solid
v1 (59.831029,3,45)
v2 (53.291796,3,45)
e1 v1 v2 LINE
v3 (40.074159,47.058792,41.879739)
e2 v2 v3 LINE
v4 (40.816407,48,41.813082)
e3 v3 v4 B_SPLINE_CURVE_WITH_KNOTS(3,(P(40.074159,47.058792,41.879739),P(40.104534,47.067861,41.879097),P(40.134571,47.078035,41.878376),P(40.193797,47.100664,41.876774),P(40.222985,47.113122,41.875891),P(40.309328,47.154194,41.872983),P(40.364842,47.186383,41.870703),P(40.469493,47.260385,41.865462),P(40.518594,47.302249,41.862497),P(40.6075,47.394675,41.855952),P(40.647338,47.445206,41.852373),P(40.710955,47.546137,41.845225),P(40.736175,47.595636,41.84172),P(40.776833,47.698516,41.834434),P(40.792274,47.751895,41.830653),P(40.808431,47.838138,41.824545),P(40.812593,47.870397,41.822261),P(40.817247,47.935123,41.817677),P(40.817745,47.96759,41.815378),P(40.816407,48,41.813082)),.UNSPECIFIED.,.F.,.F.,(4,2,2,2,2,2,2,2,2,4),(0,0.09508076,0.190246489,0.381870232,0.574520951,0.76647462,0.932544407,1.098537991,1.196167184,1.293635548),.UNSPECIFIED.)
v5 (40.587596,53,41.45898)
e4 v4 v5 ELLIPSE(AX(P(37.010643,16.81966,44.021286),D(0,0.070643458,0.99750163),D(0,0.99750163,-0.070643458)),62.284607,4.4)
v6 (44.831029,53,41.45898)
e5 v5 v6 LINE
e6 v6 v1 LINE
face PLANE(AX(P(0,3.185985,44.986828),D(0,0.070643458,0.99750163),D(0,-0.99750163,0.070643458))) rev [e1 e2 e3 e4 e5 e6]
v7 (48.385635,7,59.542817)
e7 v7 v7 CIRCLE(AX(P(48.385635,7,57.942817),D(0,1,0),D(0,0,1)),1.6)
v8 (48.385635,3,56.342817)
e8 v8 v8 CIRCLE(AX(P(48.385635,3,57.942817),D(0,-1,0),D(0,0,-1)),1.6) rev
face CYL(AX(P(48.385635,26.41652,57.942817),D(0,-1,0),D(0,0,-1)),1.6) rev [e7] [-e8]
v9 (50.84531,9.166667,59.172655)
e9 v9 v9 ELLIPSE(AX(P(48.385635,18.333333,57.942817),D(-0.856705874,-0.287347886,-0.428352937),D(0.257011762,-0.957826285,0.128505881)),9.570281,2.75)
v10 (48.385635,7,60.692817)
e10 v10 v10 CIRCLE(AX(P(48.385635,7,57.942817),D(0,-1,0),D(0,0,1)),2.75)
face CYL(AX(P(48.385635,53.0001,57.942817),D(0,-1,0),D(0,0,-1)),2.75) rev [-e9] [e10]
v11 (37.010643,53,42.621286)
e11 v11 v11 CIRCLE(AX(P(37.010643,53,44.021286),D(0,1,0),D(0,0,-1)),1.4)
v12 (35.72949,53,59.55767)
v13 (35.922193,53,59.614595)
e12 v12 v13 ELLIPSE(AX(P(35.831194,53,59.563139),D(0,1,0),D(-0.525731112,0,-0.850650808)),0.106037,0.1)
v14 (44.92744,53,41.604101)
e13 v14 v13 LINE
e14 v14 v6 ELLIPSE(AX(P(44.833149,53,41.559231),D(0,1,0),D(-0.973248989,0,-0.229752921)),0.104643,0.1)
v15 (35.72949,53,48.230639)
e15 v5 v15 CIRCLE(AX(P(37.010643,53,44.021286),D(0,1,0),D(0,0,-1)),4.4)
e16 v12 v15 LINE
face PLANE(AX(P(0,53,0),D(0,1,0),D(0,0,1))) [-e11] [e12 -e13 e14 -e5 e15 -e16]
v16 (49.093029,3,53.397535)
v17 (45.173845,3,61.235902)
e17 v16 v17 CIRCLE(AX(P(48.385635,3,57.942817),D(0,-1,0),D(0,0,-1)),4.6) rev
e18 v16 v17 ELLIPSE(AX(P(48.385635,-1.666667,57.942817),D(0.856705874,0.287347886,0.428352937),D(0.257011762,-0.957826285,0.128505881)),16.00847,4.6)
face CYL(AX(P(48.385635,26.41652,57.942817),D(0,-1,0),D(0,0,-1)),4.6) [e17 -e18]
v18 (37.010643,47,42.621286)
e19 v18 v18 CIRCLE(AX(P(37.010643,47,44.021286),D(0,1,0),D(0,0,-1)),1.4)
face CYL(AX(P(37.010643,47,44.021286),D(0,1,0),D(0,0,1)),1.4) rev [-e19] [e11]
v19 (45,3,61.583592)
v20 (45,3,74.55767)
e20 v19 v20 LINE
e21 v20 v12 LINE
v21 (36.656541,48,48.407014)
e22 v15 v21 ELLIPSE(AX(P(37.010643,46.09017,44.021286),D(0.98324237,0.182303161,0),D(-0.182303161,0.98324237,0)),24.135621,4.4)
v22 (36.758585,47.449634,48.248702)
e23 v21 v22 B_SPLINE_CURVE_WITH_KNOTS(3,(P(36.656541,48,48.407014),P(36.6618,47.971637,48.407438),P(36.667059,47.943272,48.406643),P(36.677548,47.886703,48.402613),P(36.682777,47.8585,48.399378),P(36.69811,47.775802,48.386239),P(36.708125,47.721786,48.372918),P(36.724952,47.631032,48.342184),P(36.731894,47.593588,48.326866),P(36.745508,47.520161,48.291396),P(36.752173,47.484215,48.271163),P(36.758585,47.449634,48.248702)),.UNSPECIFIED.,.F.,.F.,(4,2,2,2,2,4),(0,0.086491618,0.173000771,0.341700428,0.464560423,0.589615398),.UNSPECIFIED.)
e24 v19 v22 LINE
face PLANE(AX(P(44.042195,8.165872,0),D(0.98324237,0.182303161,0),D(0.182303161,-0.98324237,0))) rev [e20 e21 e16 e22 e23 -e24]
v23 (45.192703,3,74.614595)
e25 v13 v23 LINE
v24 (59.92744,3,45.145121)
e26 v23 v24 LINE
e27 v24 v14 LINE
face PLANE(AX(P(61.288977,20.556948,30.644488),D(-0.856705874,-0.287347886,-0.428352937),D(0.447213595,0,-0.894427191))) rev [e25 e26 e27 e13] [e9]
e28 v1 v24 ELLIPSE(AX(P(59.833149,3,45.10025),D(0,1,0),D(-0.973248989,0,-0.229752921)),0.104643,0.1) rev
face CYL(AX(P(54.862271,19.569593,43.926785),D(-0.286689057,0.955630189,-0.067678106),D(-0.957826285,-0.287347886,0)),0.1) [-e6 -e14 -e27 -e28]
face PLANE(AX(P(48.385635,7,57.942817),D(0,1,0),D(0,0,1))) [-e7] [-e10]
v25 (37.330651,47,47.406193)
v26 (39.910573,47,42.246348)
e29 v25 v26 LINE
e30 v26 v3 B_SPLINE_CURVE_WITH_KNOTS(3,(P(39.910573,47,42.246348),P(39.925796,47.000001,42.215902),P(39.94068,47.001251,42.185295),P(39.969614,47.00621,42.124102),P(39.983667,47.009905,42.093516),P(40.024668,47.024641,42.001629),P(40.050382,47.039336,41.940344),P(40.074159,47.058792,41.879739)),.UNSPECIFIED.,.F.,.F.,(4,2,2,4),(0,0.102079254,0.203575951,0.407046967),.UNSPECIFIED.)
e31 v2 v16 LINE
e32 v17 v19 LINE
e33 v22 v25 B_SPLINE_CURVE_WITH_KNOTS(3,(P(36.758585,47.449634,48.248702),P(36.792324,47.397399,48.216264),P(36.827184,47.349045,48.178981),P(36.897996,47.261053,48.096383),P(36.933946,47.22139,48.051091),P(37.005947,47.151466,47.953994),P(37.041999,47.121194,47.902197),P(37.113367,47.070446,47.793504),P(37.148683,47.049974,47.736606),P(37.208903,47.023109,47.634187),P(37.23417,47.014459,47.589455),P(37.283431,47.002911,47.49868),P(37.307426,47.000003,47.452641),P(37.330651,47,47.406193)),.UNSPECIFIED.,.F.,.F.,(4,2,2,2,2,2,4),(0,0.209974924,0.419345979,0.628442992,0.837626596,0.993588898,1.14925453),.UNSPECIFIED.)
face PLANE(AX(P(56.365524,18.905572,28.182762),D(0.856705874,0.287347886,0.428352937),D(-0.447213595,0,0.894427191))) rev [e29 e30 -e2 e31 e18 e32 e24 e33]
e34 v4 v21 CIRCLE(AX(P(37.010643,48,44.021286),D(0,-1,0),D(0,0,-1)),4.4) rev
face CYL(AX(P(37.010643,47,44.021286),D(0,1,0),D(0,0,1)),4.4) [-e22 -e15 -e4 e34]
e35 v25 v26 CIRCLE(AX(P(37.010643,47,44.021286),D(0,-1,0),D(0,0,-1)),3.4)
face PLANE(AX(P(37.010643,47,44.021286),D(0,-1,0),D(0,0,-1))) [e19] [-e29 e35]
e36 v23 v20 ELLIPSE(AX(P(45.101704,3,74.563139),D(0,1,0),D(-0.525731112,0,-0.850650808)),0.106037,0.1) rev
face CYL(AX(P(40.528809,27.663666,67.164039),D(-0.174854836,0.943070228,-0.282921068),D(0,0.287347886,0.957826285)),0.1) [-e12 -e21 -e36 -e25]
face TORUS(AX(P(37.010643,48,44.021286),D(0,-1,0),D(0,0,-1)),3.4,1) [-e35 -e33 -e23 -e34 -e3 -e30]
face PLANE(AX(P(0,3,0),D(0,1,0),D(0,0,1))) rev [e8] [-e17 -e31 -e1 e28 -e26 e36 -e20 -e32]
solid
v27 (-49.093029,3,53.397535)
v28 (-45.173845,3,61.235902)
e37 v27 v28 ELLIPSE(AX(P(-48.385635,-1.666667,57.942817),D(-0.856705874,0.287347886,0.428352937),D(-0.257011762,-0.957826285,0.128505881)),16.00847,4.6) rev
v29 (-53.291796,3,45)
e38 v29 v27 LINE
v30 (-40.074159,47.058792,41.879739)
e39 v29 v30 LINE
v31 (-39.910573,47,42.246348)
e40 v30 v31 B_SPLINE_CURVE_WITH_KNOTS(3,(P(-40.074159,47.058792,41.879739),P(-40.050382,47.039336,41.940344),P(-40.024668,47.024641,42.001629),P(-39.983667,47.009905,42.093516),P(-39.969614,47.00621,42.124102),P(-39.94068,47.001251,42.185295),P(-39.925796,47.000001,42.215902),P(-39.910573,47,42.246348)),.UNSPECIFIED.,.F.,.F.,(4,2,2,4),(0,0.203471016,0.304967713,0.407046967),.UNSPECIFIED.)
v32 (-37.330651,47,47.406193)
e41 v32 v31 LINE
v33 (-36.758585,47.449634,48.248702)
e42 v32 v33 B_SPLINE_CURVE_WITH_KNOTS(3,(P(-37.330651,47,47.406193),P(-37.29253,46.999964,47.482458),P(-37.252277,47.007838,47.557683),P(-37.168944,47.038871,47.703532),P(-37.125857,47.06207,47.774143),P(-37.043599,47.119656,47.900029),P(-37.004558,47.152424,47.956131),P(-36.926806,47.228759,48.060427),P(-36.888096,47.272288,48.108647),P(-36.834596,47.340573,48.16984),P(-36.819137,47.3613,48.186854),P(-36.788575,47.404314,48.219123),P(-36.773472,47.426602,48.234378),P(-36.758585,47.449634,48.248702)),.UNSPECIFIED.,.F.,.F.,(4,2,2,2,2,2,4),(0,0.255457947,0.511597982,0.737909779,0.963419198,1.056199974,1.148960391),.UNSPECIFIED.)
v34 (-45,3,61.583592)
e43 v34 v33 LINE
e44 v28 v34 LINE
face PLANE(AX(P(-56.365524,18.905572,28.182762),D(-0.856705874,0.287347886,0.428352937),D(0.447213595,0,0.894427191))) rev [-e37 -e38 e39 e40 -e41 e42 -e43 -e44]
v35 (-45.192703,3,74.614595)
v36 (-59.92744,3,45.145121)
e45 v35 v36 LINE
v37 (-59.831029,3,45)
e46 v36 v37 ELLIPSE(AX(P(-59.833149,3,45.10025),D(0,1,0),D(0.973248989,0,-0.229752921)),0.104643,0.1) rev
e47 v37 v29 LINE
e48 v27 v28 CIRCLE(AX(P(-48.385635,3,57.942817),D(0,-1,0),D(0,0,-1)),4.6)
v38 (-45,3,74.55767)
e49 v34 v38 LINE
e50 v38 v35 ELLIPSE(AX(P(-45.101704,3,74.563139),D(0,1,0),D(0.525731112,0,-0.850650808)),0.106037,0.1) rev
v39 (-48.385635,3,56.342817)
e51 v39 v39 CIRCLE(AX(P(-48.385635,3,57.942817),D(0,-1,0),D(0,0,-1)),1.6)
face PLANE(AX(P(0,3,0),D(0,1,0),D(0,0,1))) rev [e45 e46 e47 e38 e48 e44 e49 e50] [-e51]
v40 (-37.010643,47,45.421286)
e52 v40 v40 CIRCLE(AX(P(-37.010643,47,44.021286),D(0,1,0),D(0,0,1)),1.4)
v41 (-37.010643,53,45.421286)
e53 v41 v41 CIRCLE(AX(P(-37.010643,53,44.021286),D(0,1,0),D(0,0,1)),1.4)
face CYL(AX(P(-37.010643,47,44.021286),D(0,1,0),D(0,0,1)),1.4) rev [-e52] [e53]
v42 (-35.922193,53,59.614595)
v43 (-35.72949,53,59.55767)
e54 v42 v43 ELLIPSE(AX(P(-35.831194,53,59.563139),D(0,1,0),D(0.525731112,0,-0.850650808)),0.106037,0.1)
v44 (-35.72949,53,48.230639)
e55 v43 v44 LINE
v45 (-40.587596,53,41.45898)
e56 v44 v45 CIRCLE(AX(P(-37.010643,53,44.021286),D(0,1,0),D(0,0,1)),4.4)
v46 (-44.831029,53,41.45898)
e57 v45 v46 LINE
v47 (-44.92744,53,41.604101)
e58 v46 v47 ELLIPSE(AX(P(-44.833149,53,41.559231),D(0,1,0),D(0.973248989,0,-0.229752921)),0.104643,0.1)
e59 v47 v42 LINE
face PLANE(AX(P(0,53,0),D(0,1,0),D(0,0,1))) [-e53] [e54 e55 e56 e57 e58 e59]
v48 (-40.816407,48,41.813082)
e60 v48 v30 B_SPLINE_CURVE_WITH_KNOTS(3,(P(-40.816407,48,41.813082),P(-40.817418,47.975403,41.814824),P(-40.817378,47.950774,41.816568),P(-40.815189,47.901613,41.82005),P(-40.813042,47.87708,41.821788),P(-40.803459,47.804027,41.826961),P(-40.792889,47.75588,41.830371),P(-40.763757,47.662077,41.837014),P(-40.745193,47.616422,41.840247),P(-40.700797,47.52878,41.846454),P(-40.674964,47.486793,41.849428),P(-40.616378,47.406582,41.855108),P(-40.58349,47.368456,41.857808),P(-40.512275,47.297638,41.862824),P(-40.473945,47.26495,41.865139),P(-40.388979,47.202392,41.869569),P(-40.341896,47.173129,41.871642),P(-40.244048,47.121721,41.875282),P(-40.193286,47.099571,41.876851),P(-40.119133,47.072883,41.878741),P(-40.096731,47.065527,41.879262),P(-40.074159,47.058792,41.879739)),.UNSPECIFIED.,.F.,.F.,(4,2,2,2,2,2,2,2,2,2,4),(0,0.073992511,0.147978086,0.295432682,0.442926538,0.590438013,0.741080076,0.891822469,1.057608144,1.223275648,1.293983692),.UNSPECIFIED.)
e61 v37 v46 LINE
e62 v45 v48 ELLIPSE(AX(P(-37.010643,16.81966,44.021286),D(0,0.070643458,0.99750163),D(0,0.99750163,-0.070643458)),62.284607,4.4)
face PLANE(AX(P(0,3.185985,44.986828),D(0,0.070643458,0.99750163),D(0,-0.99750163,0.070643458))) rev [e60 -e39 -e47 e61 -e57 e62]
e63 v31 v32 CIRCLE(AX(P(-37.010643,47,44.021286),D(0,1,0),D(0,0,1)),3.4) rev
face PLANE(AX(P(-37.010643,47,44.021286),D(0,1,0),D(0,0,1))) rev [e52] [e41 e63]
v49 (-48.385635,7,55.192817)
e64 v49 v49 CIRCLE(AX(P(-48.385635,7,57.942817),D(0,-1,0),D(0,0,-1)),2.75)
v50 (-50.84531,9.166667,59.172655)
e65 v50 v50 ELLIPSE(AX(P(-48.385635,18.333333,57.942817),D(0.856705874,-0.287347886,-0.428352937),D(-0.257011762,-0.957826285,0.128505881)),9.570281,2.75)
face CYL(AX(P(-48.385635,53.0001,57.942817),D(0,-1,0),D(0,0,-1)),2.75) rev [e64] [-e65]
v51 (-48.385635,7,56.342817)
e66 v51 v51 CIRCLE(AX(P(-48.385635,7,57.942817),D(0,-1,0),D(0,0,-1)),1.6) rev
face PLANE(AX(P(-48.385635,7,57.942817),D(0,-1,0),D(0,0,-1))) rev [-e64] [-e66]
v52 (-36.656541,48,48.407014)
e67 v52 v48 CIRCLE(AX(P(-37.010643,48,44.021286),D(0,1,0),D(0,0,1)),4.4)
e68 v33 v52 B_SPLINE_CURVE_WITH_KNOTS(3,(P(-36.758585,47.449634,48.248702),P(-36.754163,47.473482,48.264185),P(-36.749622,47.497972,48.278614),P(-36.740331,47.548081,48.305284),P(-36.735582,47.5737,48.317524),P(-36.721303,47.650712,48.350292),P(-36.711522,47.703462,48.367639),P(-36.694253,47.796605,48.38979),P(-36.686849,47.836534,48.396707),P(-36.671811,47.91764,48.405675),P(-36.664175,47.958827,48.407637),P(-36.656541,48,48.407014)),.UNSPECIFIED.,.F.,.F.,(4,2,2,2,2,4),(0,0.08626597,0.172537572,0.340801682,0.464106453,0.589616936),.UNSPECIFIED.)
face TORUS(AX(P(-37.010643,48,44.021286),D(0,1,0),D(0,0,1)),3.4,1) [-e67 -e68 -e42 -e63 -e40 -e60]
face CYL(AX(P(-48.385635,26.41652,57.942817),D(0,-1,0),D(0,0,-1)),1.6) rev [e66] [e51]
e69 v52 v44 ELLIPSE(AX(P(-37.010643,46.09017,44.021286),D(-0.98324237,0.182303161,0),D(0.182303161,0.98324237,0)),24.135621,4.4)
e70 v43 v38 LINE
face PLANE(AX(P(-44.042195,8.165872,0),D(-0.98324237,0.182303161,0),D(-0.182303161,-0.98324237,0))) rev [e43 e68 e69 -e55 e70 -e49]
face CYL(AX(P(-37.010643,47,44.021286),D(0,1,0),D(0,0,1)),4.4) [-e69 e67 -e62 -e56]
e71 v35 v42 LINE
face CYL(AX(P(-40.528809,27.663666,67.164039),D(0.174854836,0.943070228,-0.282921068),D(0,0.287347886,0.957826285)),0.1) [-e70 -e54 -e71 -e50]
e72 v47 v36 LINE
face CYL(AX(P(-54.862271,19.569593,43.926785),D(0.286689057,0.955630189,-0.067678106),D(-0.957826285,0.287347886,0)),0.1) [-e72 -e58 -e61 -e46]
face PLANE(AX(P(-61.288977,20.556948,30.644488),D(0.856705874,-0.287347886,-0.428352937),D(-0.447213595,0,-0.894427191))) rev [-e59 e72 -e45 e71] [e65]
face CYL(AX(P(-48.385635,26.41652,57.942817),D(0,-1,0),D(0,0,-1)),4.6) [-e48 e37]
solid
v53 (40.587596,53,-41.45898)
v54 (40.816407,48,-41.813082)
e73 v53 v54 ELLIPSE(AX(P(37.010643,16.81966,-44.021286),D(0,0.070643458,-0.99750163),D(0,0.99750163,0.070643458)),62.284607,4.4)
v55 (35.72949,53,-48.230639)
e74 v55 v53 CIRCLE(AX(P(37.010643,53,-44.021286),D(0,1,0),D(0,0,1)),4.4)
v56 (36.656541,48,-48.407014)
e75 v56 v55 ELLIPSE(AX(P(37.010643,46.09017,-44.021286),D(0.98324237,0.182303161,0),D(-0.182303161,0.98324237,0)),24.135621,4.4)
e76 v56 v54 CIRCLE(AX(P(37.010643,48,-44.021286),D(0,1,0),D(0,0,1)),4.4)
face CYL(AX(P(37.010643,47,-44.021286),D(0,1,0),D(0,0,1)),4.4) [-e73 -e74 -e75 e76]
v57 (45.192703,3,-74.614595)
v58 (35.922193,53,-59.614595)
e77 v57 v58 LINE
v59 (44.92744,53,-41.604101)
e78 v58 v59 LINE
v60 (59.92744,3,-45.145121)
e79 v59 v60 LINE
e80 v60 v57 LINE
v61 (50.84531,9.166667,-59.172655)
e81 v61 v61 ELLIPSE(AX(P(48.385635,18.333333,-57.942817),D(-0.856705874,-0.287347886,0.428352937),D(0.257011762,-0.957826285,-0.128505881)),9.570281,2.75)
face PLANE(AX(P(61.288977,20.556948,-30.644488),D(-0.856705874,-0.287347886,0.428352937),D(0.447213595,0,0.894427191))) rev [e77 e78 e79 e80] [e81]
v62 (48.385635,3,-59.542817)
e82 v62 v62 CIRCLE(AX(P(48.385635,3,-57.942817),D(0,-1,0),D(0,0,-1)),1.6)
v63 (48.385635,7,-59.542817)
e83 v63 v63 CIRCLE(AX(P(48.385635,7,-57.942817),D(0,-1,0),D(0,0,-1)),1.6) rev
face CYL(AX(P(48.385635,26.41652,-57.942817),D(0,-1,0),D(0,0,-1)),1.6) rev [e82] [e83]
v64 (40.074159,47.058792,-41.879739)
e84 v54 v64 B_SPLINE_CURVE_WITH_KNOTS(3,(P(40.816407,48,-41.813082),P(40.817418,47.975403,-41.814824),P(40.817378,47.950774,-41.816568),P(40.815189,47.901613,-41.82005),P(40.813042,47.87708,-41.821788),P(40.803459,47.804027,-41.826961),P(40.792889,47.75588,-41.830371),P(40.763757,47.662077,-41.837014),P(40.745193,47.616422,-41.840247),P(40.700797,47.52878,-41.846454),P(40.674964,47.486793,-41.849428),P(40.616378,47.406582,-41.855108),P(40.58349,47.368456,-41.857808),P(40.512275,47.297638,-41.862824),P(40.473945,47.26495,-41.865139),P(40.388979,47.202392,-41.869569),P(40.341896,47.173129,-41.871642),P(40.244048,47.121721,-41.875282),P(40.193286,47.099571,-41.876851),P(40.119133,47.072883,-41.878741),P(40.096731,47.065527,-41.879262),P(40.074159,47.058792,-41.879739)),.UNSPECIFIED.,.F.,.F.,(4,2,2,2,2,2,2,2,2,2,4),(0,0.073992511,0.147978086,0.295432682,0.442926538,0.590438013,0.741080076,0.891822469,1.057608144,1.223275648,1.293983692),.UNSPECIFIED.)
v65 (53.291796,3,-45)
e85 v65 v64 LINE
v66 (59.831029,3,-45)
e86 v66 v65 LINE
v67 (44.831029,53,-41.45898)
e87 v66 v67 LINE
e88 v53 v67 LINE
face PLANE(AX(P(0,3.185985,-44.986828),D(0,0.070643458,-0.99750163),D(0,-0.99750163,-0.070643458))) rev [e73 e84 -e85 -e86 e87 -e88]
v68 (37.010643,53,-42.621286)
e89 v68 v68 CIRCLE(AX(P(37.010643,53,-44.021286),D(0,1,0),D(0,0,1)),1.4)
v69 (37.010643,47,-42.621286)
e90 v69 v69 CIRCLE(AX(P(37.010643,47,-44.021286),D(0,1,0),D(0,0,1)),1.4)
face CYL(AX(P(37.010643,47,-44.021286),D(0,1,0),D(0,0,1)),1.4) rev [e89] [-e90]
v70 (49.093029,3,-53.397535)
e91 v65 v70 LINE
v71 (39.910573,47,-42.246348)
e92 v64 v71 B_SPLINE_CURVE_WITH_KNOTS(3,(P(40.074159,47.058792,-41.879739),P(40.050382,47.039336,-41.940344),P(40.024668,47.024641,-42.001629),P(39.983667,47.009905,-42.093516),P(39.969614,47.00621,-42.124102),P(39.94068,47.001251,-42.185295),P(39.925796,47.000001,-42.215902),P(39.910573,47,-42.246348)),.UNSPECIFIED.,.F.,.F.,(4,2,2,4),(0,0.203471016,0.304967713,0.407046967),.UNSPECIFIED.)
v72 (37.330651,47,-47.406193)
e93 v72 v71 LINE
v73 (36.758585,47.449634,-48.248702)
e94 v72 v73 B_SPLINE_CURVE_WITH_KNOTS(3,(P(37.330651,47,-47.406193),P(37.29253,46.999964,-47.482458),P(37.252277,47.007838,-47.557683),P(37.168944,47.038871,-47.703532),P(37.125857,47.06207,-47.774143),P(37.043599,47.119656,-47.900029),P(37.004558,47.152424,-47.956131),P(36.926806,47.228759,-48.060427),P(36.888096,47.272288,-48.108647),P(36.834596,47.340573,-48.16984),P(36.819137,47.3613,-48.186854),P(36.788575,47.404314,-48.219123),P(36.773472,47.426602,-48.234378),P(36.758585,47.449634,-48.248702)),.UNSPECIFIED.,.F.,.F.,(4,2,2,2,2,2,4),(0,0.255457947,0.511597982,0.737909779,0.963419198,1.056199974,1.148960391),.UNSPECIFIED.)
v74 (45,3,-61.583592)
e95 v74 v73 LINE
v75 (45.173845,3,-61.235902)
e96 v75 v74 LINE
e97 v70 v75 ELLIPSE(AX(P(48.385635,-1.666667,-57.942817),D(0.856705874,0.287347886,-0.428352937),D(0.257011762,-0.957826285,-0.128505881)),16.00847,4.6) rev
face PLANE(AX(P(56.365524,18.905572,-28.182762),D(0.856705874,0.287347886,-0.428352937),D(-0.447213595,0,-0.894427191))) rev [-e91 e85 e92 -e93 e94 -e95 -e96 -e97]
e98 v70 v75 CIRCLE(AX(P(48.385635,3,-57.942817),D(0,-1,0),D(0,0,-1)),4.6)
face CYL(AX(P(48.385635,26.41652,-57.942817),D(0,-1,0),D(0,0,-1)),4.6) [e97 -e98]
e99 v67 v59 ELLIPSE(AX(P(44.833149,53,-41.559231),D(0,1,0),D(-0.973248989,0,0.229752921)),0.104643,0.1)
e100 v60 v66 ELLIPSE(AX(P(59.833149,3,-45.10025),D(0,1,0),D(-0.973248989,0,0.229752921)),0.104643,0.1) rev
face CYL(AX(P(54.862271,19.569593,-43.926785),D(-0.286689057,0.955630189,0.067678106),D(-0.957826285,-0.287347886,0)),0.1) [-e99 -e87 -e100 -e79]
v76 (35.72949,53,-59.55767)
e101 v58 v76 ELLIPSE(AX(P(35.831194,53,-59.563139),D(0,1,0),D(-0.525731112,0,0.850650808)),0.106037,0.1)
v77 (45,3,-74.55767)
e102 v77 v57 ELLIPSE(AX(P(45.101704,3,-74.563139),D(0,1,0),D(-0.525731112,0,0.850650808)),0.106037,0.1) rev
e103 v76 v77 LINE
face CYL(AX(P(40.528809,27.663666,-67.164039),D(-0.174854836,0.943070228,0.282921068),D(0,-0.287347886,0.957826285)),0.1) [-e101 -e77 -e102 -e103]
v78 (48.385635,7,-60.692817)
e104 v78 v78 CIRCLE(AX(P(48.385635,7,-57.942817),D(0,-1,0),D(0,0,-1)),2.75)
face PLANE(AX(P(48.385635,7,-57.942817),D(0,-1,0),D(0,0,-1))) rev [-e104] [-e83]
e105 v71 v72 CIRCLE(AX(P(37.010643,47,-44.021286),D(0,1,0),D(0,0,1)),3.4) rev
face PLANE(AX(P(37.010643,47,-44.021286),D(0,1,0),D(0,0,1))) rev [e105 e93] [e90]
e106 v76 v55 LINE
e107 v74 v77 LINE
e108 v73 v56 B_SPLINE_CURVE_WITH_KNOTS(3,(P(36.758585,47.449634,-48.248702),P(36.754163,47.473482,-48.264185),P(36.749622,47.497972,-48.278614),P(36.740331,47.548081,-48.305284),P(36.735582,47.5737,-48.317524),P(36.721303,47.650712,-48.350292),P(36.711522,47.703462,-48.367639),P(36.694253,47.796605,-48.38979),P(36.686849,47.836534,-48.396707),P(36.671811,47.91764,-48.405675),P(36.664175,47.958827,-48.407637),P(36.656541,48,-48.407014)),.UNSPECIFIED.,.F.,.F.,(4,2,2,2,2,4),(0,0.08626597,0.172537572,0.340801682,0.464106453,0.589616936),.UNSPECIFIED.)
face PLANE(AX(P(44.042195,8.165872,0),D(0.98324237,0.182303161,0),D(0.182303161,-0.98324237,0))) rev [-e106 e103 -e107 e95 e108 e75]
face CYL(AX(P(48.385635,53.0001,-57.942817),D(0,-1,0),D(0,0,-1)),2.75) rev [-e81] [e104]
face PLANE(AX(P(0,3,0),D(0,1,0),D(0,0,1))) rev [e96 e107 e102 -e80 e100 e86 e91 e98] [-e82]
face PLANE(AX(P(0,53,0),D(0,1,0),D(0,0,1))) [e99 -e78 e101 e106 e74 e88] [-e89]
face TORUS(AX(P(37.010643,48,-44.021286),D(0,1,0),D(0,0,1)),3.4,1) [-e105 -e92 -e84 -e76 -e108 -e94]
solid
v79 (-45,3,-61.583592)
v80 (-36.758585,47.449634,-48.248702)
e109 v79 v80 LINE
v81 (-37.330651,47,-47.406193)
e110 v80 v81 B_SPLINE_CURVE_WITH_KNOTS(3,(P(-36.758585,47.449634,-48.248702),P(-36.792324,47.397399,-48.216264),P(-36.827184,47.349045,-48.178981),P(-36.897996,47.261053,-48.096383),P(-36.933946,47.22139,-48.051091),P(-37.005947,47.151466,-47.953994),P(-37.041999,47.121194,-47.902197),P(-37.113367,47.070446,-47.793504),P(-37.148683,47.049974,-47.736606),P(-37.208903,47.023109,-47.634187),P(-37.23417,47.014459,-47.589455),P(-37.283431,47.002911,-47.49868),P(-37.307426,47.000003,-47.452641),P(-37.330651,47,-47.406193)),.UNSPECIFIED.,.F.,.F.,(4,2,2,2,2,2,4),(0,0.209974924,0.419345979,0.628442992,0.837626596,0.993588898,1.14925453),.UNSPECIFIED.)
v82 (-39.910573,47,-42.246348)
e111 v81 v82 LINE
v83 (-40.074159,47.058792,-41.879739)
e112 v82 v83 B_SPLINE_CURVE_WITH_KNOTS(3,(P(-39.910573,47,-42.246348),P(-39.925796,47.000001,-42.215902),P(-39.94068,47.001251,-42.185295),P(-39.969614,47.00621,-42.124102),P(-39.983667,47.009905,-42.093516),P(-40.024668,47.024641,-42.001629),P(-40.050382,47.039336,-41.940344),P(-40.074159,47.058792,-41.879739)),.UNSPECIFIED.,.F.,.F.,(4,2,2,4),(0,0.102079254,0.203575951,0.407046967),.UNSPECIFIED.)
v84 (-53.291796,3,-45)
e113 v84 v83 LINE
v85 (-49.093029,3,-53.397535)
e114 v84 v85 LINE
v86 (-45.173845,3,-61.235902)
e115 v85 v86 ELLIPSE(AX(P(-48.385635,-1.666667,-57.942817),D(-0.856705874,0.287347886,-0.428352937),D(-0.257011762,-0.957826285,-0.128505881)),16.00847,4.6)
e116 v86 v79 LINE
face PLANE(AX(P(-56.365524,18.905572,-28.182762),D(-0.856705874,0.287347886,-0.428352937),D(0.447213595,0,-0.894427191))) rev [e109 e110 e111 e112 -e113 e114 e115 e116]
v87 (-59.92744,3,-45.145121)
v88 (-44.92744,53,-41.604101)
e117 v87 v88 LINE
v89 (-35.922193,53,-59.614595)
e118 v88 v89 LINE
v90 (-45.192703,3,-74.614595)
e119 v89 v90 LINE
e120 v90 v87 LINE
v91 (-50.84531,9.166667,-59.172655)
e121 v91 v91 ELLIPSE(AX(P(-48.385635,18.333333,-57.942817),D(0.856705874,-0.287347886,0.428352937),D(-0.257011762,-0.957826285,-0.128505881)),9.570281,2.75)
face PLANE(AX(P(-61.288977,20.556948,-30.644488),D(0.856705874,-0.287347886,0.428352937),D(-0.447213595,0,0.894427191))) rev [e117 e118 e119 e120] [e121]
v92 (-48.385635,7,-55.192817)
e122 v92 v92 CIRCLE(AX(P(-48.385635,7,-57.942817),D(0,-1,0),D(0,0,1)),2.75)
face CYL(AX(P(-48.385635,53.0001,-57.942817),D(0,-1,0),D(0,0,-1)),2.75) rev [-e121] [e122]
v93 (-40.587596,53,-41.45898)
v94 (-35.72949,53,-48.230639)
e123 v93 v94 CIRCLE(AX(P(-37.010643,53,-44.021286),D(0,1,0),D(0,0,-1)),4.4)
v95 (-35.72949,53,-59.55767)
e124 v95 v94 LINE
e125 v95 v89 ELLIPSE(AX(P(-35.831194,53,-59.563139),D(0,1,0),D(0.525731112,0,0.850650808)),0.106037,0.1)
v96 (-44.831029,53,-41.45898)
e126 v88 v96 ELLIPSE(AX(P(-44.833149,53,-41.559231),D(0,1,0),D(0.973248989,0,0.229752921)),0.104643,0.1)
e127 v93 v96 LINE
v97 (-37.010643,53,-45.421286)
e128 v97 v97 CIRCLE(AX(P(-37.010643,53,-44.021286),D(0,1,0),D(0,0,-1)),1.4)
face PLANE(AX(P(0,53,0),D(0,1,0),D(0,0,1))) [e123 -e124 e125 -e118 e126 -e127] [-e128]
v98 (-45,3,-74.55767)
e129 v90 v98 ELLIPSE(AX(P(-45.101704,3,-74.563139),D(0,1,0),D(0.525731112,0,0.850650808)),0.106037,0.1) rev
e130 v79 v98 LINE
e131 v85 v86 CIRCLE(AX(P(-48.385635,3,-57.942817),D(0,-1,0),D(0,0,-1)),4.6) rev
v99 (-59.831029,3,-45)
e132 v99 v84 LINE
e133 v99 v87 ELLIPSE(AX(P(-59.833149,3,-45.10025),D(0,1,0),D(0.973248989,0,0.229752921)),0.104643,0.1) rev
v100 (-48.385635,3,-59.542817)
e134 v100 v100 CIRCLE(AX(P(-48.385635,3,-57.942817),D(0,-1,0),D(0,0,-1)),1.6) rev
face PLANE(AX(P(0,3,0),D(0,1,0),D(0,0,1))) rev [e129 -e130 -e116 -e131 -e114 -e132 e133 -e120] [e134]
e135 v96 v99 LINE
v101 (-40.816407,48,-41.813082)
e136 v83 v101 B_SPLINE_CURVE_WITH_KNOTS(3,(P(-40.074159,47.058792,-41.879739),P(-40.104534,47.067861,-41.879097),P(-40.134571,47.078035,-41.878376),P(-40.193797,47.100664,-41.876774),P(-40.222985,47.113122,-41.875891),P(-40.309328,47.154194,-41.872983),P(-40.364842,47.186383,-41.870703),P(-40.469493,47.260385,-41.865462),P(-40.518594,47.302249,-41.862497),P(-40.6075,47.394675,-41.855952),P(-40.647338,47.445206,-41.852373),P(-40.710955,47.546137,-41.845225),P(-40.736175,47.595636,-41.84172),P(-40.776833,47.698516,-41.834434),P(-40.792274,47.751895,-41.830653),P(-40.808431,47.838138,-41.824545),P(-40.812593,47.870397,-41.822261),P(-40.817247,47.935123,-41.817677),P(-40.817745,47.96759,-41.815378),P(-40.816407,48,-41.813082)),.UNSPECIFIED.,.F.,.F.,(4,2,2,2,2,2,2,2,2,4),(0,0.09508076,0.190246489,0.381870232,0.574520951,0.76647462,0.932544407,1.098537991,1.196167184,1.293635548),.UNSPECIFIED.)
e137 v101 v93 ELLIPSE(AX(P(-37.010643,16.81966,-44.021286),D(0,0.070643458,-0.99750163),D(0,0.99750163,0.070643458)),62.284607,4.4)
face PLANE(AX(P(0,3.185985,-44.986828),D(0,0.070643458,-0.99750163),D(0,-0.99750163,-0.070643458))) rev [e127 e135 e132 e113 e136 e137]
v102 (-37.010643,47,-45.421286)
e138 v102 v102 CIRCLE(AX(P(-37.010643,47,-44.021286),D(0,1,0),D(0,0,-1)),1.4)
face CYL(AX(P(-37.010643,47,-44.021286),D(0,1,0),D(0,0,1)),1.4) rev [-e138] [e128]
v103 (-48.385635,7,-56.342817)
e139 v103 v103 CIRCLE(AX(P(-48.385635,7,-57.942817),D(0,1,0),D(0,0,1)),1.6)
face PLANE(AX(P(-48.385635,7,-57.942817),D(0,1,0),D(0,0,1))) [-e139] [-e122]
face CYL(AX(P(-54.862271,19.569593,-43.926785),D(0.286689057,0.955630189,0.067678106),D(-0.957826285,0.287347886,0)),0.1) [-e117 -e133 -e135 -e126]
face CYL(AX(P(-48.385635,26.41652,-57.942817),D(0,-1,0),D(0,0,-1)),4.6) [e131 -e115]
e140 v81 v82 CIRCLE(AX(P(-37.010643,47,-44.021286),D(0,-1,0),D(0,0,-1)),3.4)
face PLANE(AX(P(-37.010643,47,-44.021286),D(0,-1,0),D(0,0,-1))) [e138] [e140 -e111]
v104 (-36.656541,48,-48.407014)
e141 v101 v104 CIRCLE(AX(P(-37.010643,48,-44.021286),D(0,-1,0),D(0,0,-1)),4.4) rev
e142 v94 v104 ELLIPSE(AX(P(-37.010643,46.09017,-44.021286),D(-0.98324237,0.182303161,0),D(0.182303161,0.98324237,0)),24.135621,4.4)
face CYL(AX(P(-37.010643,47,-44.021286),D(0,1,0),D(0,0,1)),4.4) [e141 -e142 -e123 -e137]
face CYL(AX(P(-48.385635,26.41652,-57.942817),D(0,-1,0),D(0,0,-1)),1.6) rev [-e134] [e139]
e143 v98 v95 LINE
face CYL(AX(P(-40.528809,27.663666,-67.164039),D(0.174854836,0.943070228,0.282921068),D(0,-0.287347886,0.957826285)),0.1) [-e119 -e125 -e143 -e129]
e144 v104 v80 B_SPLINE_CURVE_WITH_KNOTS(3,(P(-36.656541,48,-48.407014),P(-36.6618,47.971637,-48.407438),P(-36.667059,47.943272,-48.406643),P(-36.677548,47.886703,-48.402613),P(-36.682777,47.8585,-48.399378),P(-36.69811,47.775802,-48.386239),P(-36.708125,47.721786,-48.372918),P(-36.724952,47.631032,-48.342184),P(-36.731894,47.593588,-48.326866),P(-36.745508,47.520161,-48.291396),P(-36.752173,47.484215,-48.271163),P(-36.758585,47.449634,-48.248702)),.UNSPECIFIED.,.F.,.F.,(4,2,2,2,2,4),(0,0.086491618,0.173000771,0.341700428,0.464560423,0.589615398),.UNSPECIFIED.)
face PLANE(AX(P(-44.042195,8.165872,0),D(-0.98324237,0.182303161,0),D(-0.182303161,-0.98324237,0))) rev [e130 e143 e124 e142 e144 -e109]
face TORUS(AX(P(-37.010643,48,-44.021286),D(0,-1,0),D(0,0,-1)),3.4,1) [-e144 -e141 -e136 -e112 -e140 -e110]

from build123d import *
from build123d.topology import SkipClean

# Parameters (mm, degrees)
SKETCH1_W                       = 120
SKETCH1_H                       = 150
BOSS_EXTRUDE1_DEPTH             = 3
BOSS_EXTRUDE2_REACH             = 98.094
BOSS_EXTRUDE2_DIRECTION_2_REACH = 98.094
CUT_EXTRUDE1_START              = 18
CUT_EXTRUDE1_DEPTH              = 50.8
CUT_EXTRUDE2_DEPTH              = 99.222526147
BOSS_EXTRUDE3_DEPTH             = 4
CUT_EXTRUDE3_DEPTH              = 4
CUT_EXTRUDE4_DEPTH              = 109.282039309
SKETCH10_R                      = 4.4
SKETCH10_R_2                    = 1.4
BOSS_EXTRUDE4_DEPTH             = 6
SKETCH10_2_R                    = 1.4
CUT_EXTRUDE5_DEPTH              = 109.282039309
FILLET1_R                       = 1
FILLET2_R                       = 1
FILLET3_R                       = 1
FILLET4_R                       = 1
BOSS_EXTRUDE5_START             = -10.666667
BOSS_EXTRUDE5_DEPTH             = 10.666667
BOSS_EXTRUDE7_START             = -10.666667
BOSS_EXTRUDE7_DEPTH             = 10.666667
BOSS_EXTRUDE8_START             = -10.666667
BOSS_EXTRUDE8_DEPTH             = 10.666667
BOSS_EXTRUDE9_START             = -10.666667
BOSS_EXTRUDE9_DEPTH             = 10.666667
SKETCH12_3_R                    = 1.6
CUT_EXTRUDE6_DEPTH              = 109.282039309
CUT_EXTRUDE7_START              = -4
SKETCH13_R                      = 2.75
CUT_EXTRUDE7_DEPTH              = 105.282039309
FILLET5_R                       = 0.1
FILLET6_R                       = 0.1
FILLET7_R                       = 0.1
FILLET8_R                       = 0.1


# Read off the part's stored shape, not the designer's step: Mirror3
with BuildPart() as part:
    # Sketch1 → Boss-Extrude1 (new, symmetric)
    with BuildSketch(Plane(origin=(0, 0, 0), x_dir=(1, 0, 0), z_dir=(0, 1, 0))):
        Rectangle(SKETCH1_W, SKETCH1_H)
    extrude(amount=BOSS_EXTRUDE1_DEPTH, both=True)

    # Boss-Extrude2: up to this face of the body (flat: up to its plane)
    boss_extrude2_end = Plane(part.part.faces().sort_by_distance((0, 0, 75))[0])
    # Sketch2 → Boss-Extrude2 (add, up to the picked face)
    with BuildSketch(Plane.XY, mode=Mode.PRIVATE) as boss_extrude2_sk1:
        Polygon((-60, -3), (-60, -17.558809371), (-20, -3), align=None)
    boss_extrude2_tool1 = split(extrude(boss_extrude2_sk1.sketch, amount=BOSS_EXTRUDE2_REACH, mode=Mode.PRIVATE), bisect_by=boss_extrude2_end, keep=Keep.BOTH, mode=Mode.PRIVATE)
    # Sketch2 → Boss-Extrude2 (add, up to the picked face)
    with BuildSketch(Plane.XY, mode=Mode.PRIVATE) as boss_extrude2_sk2:
        Polygon((20, -3), (60, -3), (60, -17.558809371), align=None)
    boss_extrude2_tool2 = split(extrude(boss_extrude2_sk2.sketch, amount=BOSS_EXTRUDE2_REACH, mode=Mode.PRIVATE), bisect_by=boss_extrude2_end, keep=Keep.BOTH, mode=Mode.PRIVATE)
    add(boss_extrude2_tool1.solids().sort_by(Axis((-46.666667, -7.852936, 0), (0, 0, 1)))[0])
    add(boss_extrude2_tool2.solids().sort_by(Axis((46.666667, -7.852936, 0), (0, 0, 1)))[0])

    # Boss-Extrude2 direction 2: up to this face of the body (flat: up to its plane)
    boss_extrude2_direction_2_end = Plane(part.part.faces().sort_by_distance((0, 0, -75))[0])
    # Sketch2 → Boss-Extrude2 direction 2 (add, up to the picked face)
    with BuildSketch(Plane.XY, mode=Mode.PRIVATE) as boss_extrude2_direction_2_sk1:
        Polygon((-60, -3), (-60, -17.558809371), (-20, -3), align=None)
    boss_extrude2_direction_2_tool1 = split(extrude(boss_extrude2_direction_2_sk1.sketch, amount=-BOSS_EXTRUDE2_DIRECTION_2_REACH, mode=Mode.PRIVATE), bisect_by=boss_extrude2_direction_2_end, keep=Keep.BOTH, mode=Mode.PRIVATE)
    # Sketch2 → Boss-Extrude2 direction 2 (add, up to the picked face)
    with BuildSketch(Plane.XY, mode=Mode.PRIVATE) as boss_extrude2_direction_2_sk2:
        Polygon((20, -3), (60, -3), (60, -17.558809371), align=None)
    boss_extrude2_direction_2_tool2 = split(extrude(boss_extrude2_direction_2_sk2.sketch, amount=-BOSS_EXTRUDE2_DIRECTION_2_REACH, mode=Mode.PRIVATE), bisect_by=boss_extrude2_direction_2_end, keep=Keep.BOTH, mode=Mode.PRIVATE)
    add(boss_extrude2_direction_2_tool1.solids().sort_by(Axis((-46.666667, -7.852936, 0), (0, 0, -1)))[0])
    add(boss_extrude2_direction_2_tool2.solids().sort_by(Axis((46.666667, -7.852936, 0), (0, 0, -1)))[0])

    # Sketch3 → Cut-Extrude1 (cut)
    with BuildSketch(Plane.XY.offset(CUT_EXTRUDE1_START)):
        Polygon((-20, -3), (-46.314239601, -3), (-60, -7.981209418), (-60, -13.302098281), (-45.432604698, -8), (-33.737387097, -8), align=None)
        Polygon((33.737387097, -8), (20, -3), (46.314239601, -3), (60, -7.981209418), (60, -13.302098281), (45.432604698, -8), align=None)
    cut_extrude1 = extrude(amount=CUT_EXTRUDE1_DEPTH, mode=Mode.SUBTRACT)

    # Mirror1: Cut-Extrude1 across plane
    add(cut_extrude1.mirror(Plane.XY), mode=Mode.SUBTRACT)

    # Sketch5 → Cut-Extrude2 (cut, through all)
    with BuildSketch(Plane(origin=(0, 3, 0), x_dir=(1, 0, 0), z_dir=(0, 1, 0))):
        Polygon((-60, -75), (-60, -45), (-45, -75), align=None)
        Polygon((45, -75), (60, -75), (60, -45), align=None)
        Polygon((60, 75), (60, 45), (45, 75), align=None)
        Polygon((-45, 75), (-60, 75), (-60, 45), align=None)
    extrude(amount=-CUT_EXTRUDE2_DEPTH, mode=Mode.SUBTRACT)



with BuildPart() as body_2:
    # Sketch4 → Boss-Extrude3 (new body)
    with BuildSketch(Plane(origin=(0, 53, 0), x_dir=(1, 0, 0), z_dir=(0, 1, 0))):
        Polygon((-35.729490169, 60), (-45, 41.458980338), (-45, -41.458980338), (-35.729490169, -60), (35.729490169, -60), (45, -41.458980338), (45, 41.458980338), (35.729490169, 60), align=None)
    extrude(amount=BOSS_EXTRUDE3_DEPTH)


with BuildPart() as part_1:
    add(part.part)

    add(body_2.part)  # Loft3 merges body 2
    # Sketch6 → Loft3 section 0
    with BuildSketch(Plane(origin=(0, 3, 0), x_dir=(1, 0, 0), z_dir=(0, 1, 0))):
        with BuildLine():
            Line((-60, -45), (-53.291796068, -45))
            Line((-53.291796068, -45), (-45, -61.583592135))
            Line((-45, -61.583592135), (-45, -75))
            Line((-45, -75), (-60, -45))
        make_face()
    # Sketch7 → Loft3 section 1
    with BuildSketch(Plane(origin=(0, 53, 0), x_dir=(-1, 0, 0), z_dir=(0, -1, 0))):
        with BuildLine():
            Line((35.729490169, -60), (35.729490169, -46.583592135))
            Line((35.729490169, -46.583592135), (38.291796068, -41.458980338))
            Line((38.291796068, -41.458980338), (45, -41.458980338))
            Line((45, -41.458980338), (35.729490169, -60))
        make_face()
    loft3 = loft()

    # Mirror2: Loft3 across plane
    add(loft3.mirror(Plane(origin=(0, 0, 0), x_dir=(0, 0, 1), z_dir=(1, 0, 0))))

    # Mirror3: part across plane


with BuildPart() as part_2:
    add(part_1.part)
    add(part_1.part.mirror(Plane.XY))

    # Sketch8 → Cut-Extrude3 (cut)
    with BuildSketch(Plane(origin=(0, 57, 0), x_dir=(1, 0, 0), z_dir=(0, 1, 0))):
        Polygon((35.729490169, 60), (-35.729490169, 60), (-45, 41.458980338), (-45, -41.458980338), (-35.729490169, -60), (35.729490169, -60), (45, -41.458980338), (45, 41.458980338), align=None)
    extrude(amount=-CUT_EXTRUDE3_DEPTH, mode=Mode.SUBTRACT)

    # Sketch9 → Cut-Extrude4 (cut, through all)
    with BuildSketch(Plane(origin=(0, 3, 0), x_dir=(1, 0, 0), z_dir=(0, 1, 0))):
        Polygon((60, -45), (45, -75.0000125), (-45, -75), (-60, -45), (-60, 45), (-45, 75), (45, 75), (60, 45), align=None)
    extrude(amount=-CUT_EXTRUDE4_DEPTH, mode=Mode.SUBTRACT)


with BuildPart() as cut_extrude4_piece_1:
    # of the separate pieces the step leaves, piece 1, a body of its own (cut_extrude4_pieces)
    add(part_2.part.solids().sort_by_distance((-60, 3, -45))[0])



with BuildPart() as cut_extrude4_piece_2:
    # of the separate pieces the step leaves, piece 2, a body of its own (cut_extrude4_pieces)
    add(part_2.part.solids().sort_by_distance((-60, 3, 45))[0])


with BuildPart() as cut_extrude4_piece_3:
    # of the separate pieces the step leaves, piece 3, a body of its own (cut_extrude4_pieces)
    add(part_2.part.solids().sort_by_distance((60, 3, -45))[0])


with BuildPart() as cut_extrude4_piece_4:
    # of the separate pieces the step leaves, piece 4, a body of its own (cut_extrude4_pieces)
    add(part_2.part.solids().sort_by_distance((45, 3, 61.583592135))[0])


with BuildPart() as cut_extrude4_piece_1_1:
    add(cut_extrude4_piece_1.part)

    add(cut_extrude4_piece_2.part)  # Boss-Extrude4 merges Cut-Extrude4 piece 2

    add(cut_extrude4_piece_3.part)  # Boss-Extrude4 merges Cut-Extrude4 piece 3

    add(cut_extrude4_piece_4.part)  # Boss-Extrude4 merges Cut-Extrude4 piece 4
    # Sketch10 → Boss-Extrude4 (add)
    # profile 1 of 4: a face of its own
    with BuildSketch(Plane(origin=(0, 53, 0), x_dir=(1, 0, 0), z_dir=(0, 1, 0))):
        with Locations((-37.010643118, -44.021286236)):
            Circle(SKETCH10_R)
        with Locations(Location((-37.010643118, -44.021286236, 0), (0, 0, 270))):
            Circle(SKETCH10_R_2, mode=Mode.SUBTRACT)
    # profile 2 of 4: a face of its own
    with BuildSketch(Plane(origin=(0, 53, 0), x_dir=(1, 0, 0), z_dir=(0, 1, 0))):
        with Locations((37.010643118, -44.021286236)):
            Circle(SKETCH10_R)
        with Locations(Location((37.010643118, -44.021286236, 0), (0, 0, 243.434948823))):
            Circle(SKETCH10_R_2, mode=Mode.SUBTRACT)
    # profile 3 of 4: a face of its own
    with BuildSketch(Plane(origin=(0, 53, 0), x_dir=(1, 0, 0), z_dir=(0, 1, 0))):
        with Locations((37.010643118, 44.021286236)):
            Circle(SKETCH10_R)
        with Locations(Location((37.010643118, 44.021286236, 0), (0, 0, 270))):
            Circle(SKETCH10_R_2, mode=Mode.SUBTRACT)
    # profile 4 of 4: a face of its own
    with BuildSketch(Plane(origin=(0, 53, 0), x_dir=(1, 0, 0), z_dir=(0, 1, 0))):
        with Locations((-37.010643118, 44.021286236)):
            Circle(SKETCH10_R)
        with Locations(Location((-37.010643118, 44.021286236, 0), (0, 0, 243.434948823))):
            Circle(SKETCH10_R_2, mode=Mode.SUBTRACT)
    extrude(amount=-BOSS_EXTRUDE4_DEPTH)

    # Sketch10<2> → Cut-Extrude5 (cut, through all)
    with SkipClean():  # the faces are left unmerged after this step: merging them gives an invalid solid
        with BuildSketch(Plane(origin=(0, 53, 0), x_dir=(1, 0, 0), z_dir=(0, 1, 0))):
            with BuildLine():
                ThreePointArc((-36.384544084, -45.273484304), (-35.819731986, -44.757309793), (-35.610643118, -44.021286236))
                ThreePointArc((-35.610643118, -44.021286236), (-36.274619561, -42.830375105), (-37.636742152, -42.769088169))
                Line((-37.636742152, -42.769088169), (-36.384544084, -45.273484304))
            make_face()
            with BuildLine():
                Line((-36.384544084, -45.273484304), (-37.636742152, -42.769088169))
                ThreePointArc((-37.636742152, -42.769088169), (-38.262841186, -44.64738527), (-36.384544084, -45.273484304))
            make_face()
            with Locations(Location((37.010643118, -44.021286236, 0), (0, 0, 90))):
                Circle(SKETCH10_2_R)
            with Locations(Location((37.010643118, 44.021286236, 0), (0, 0, 270))):
                Circle(SKETCH10_2_R)
            with Locations(Location((-37.010643118, 44.021286236, 0), (0, 0, 90))):
                Circle(SKETCH10_2_R)
        extrude(amount=-CUT_EXTRUDE5_DEPTH, mode=Mode.SUBTRACT)

    # Fillet1
    fillet1_edges = [cut_extrude4_piece_1_1.edges().sort_by_distance(p)[0] for p in [
        (-33.261724109, 47, 41.717896068),
    ]]
    fillet(fillet1_edges, radius=FILLET1_R)

    # Fillet2
    fillet2_edges = [cut_extrude4_piece_1_1.edges().sort_by_distance(p)[0] for p in [
        (-33.261724109, 47, -41.717896068),
    ]]
    fillet(fillet2_edges, radius=FILLET2_R)

    # Fillet3
    fillet3_edges = [cut_extrude4_piece_1_1.edges().sort_by_distance(p)[0] for p in [
        (33.261724109, 47, -41.717896068),
    ]]
    fillet(fillet3_edges, radius=FILLET3_R)

    # Fillet4
    fillet4_edges = [cut_extrude4_piece_1_1.edges().sort_by_distance(p)[0] for p in [
        (33.261724109, 47, 41.717896068),
    ]]
    fillet(fillet4_edges, radius=FILLET4_R)

    # Sketch12 → Boss-Extrude5 (add)
    with SkipClean():  # the faces are left unmerged after this step: merging them gives an invalid solid
        with BuildSketch(Plane.XZ.offset(-3).offset(BOSS_EXTRUDE5_START)):
            with BuildLine():
                Line((-47.479847016, 56.623898104), (-49.093028648, 53.397534839))
                ThreePointArc((-49.093028648, 53.397534839), (-45.393479439, 54.448964921), (-43.785634921, 57.942817461))
                ThreePointArc((-43.785634921, 57.942817461), (-44.146871342, 59.729681562), (-45.17384506, 61.235902015))
                Line((-45.17384506, 61.235902015), (-46.787026692, 58.00953875))
                ThreePointArc((-46.787026692, 58.00953875), (-46.785982902, 57.976185362), (-46.785634921, 57.942817461))
                ThreePointArc((-46.785634921, 57.942817461), (-46.969785238, 57.197586171), (-47.479847016, 56.623898104))
            make_face()
        extrude(amount=BOSS_EXTRUDE5_DEPTH)

    # Sketch12<6> → Boss-Extrude7 (add)
    with SkipClean():  # the faces are left unmerged after this step: merging them gives an invalid solid
        with BuildSketch(Plane.XZ.offset(-3).offset(BOSS_EXTRUDE7_START)):
            with BuildLine():
                ThreePointArc((45.17384506, 61.235902015), (44.271269843, 55.885634921), (49.093028648, 53.397534839))
                Line((49.093028648, 53.397534839), (47.479847016, 56.623898104))
                ThreePointArc((47.479847016, 56.623898104), (46.954551416, 57.227275708), (46.787026692, 58.00953875))
                Line((46.787026692, 58.00953875), (45.17384506, 61.235902015))
            make_face()
        extrude(amount=BOSS_EXTRUDE7_DEPTH)

    # Sketch12<7> → Boss-Extrude8 (add)
    with SkipClean():  # the faces are left unmerged after this step: merging them gives an invalid solid
        with BuildSketch(Plane.XZ.offset(-3).offset(BOSS_EXTRUDE8_START)):
            with BuildLine():
                Line((47.479847016, -56.623898104), (49.093028648, -53.397534839))
                ThreePointArc((49.093028648, -53.397534839), (44.271269843, -55.885634921), (45.17384506, -61.235902015))
                Line((45.17384506, -61.235902015), (46.787026692, -58.00953875))
                ThreePointArc((46.787026692, -58.00953875), (46.954551416, -57.227275708), (47.479847016, -56.623898104))
            make_face()
        extrude(amount=BOSS_EXTRUDE8_DEPTH)

    # Sketch12<8> → Boss-Extrude9 (add)
    with SkipClean():  # the faces are left unmerged after this step: merging them gives an invalid solid
        with BuildSketch(Plane.XZ.offset(-3).offset(BOSS_EXTRUDE9_START)):
            with BuildLine():
                ThreePointArc((-43.785634921, -57.942817461), (-45.393479439, -54.448964921), (-49.093028648, -53.397534839))
                Line((-49.093028648, -53.397534839), (-47.479847016, -56.623898104))
                ThreePointArc((-47.479847016, -56.623898104), (-46.969785238, -57.197586171), (-46.785634921, -57.942817461))
                ThreePointArc((-46.785634921, -57.942817461), (-46.785982902, -57.976185362), (-46.787026692, -58.00953875))
                Line((-46.787026692, -58.00953875), (-45.17384506, -61.235902015))
                ThreePointArc((-45.17384506, -61.235902015), (-44.146871342, -59.729681562), (-43.785634921, -57.942817461))
            make_face()
        extrude(amount=BOSS_EXTRUDE9_DEPTH)

    # Sketch12<3> → Cut-Extrude6 (cut, through all)
    with SkipClean():  # the faces are left unmerged after this step: merging them gives an invalid solid
        with BuildSketch(Plane.XZ.offset(-3)):
            with BuildLine():
                ThreePointArc((-46.787026692, 58.00953875), (-49.816718427, 58.658359214), (-47.479847016, 56.623898104))
                Line((-47.479847016, 56.623898104), (-46.787026692, 58.00953875))
            make_face()
            with BuildLine():
                Line((-46.787026692, 58.00953875), (-47.479847016, 56.623898104))
                ThreePointArc((-47.479847016, 56.623898104), (-46.969785238, 57.197586171), (-46.785634921, 57.942817461))
                ThreePointArc((-46.785634921, 57.942817461), (-46.785982902, 57.976185362), (-46.787026692, 58.00953875))
            make_face()
            with BuildLine():
                ThreePointArc((49.985634921, -57.942817461), (49.130866211, -56.526967778), (47.479847016, -56.623898104))
                Line((47.479847016, -56.623898104), (46.787026692, -58.00953875))
                ThreePointArc((46.787026692, -58.00953875), (48.419002823, -59.54246948), (49.985634921, -57.942817461))
            make_face()
            with BuildLine():
                Line((46.787026692, -58.00953875), (47.479847016, -56.623898104))
                ThreePointArc((47.479847016, -56.623898104), (46.954551416, -57.227275708), (46.787026692, -58.00953875))
            make_face()
            with BuildLine():
                ThreePointArc((-46.785634921, -57.942817461), (-46.969785238, -57.197586171), (-47.479847016, -56.623898104))
                Line((-47.479847016, -56.623898104), (-46.787026692, -58.00953875))
                ThreePointArc((-46.787026692, -58.00953875), (-46.785982902, -57.976185362), (-46.785634921, -57.942817461))
            make_face()
            with BuildLine():
                Line((-46.787026692, -58.00953875), (-47.479847016, -56.623898104))
                ThreePointArc((-47.479847016, -56.623898104), (-49.816718427, -58.658359214), (-46.787026692, -58.00953875))
            make_face()
            with Locations(Location((48.385634921, 57.942817461, 0), (0, 0, 270))):
                Circle(SKETCH12_3_R)
        extrude(amount=-CUT_EXTRUDE6_DEPTH, mode=Mode.SUBTRACT)

    # Sketch13 → Cut-Extrude7 (cut, through all)
    with SkipClean():  # the faces are left unmerged after this step: merging them gives an invalid solid
        with BuildSketch(Plane.XZ.offset(-3).offset(CUT_EXTRUDE7_START)):
            with Locations(Location((-48.385634921, 57.942817461, 0), (0, 0, 270))):
                Circle(SKETCH13_R)
            with Locations(Location((48.385634921, 57.942817461, 0), (0, 0, 26.565051177))):
                Circle(SKETCH13_R)
            with Locations(Location((48.385634921, -57.942817461, 0), (0, 0, 270))):
                Circle(SKETCH13_R)
            with Locations(Location((-48.385634921, -57.942817461, 0), (0, 0, 206.565051177))):
                Circle(SKETCH13_R)
        extrude(amount=-CUT_EXTRUDE7_DEPTH, mode=Mode.SUBTRACT)

    # Fillet5
    fillet5_edges = [cut_extrude4_piece_1_1.edges().sort_by_distance(p)[0] for p in [
        (-52.5, 28, 43.229490169),
        (-40.364745084, 28, 67.5),
    ]]
    fillet(fillet5_edges, radius=FILLET5_R)

    # Fillet6
    fillet6_edges = [cut_extrude4_piece_1_1.edges().sort_by_distance(p)[0] for p in [
        (-52.5, 28, -43.229490169),
        (-40.364745084, 28, -67.5),
    ]]
    fillet(fillet6_edges, radius=FILLET6_R)

    # Fillet7
    fillet7_edges = [cut_extrude4_piece_1_1.edges().sort_by_distance(p)[0] for p in [
        (52.5, 28, -43.229490169),
        (40.364745084, 28, -67.5),
    ]]
    fillet(fillet7_edges, radius=FILLET7_R)

    # Fillet8
    fillet8_edges = [cut_extrude4_piece_1_1.edges().sort_by_distance(p)[0] for p in [
        (40.364745084, 28, 67.5),
        (52.5, 28, 43.229490169),
    ]]
    fillet(fillet8_edges, radius=FILLET8_R)


solid = cut_extrude4_piece_1_1.part
